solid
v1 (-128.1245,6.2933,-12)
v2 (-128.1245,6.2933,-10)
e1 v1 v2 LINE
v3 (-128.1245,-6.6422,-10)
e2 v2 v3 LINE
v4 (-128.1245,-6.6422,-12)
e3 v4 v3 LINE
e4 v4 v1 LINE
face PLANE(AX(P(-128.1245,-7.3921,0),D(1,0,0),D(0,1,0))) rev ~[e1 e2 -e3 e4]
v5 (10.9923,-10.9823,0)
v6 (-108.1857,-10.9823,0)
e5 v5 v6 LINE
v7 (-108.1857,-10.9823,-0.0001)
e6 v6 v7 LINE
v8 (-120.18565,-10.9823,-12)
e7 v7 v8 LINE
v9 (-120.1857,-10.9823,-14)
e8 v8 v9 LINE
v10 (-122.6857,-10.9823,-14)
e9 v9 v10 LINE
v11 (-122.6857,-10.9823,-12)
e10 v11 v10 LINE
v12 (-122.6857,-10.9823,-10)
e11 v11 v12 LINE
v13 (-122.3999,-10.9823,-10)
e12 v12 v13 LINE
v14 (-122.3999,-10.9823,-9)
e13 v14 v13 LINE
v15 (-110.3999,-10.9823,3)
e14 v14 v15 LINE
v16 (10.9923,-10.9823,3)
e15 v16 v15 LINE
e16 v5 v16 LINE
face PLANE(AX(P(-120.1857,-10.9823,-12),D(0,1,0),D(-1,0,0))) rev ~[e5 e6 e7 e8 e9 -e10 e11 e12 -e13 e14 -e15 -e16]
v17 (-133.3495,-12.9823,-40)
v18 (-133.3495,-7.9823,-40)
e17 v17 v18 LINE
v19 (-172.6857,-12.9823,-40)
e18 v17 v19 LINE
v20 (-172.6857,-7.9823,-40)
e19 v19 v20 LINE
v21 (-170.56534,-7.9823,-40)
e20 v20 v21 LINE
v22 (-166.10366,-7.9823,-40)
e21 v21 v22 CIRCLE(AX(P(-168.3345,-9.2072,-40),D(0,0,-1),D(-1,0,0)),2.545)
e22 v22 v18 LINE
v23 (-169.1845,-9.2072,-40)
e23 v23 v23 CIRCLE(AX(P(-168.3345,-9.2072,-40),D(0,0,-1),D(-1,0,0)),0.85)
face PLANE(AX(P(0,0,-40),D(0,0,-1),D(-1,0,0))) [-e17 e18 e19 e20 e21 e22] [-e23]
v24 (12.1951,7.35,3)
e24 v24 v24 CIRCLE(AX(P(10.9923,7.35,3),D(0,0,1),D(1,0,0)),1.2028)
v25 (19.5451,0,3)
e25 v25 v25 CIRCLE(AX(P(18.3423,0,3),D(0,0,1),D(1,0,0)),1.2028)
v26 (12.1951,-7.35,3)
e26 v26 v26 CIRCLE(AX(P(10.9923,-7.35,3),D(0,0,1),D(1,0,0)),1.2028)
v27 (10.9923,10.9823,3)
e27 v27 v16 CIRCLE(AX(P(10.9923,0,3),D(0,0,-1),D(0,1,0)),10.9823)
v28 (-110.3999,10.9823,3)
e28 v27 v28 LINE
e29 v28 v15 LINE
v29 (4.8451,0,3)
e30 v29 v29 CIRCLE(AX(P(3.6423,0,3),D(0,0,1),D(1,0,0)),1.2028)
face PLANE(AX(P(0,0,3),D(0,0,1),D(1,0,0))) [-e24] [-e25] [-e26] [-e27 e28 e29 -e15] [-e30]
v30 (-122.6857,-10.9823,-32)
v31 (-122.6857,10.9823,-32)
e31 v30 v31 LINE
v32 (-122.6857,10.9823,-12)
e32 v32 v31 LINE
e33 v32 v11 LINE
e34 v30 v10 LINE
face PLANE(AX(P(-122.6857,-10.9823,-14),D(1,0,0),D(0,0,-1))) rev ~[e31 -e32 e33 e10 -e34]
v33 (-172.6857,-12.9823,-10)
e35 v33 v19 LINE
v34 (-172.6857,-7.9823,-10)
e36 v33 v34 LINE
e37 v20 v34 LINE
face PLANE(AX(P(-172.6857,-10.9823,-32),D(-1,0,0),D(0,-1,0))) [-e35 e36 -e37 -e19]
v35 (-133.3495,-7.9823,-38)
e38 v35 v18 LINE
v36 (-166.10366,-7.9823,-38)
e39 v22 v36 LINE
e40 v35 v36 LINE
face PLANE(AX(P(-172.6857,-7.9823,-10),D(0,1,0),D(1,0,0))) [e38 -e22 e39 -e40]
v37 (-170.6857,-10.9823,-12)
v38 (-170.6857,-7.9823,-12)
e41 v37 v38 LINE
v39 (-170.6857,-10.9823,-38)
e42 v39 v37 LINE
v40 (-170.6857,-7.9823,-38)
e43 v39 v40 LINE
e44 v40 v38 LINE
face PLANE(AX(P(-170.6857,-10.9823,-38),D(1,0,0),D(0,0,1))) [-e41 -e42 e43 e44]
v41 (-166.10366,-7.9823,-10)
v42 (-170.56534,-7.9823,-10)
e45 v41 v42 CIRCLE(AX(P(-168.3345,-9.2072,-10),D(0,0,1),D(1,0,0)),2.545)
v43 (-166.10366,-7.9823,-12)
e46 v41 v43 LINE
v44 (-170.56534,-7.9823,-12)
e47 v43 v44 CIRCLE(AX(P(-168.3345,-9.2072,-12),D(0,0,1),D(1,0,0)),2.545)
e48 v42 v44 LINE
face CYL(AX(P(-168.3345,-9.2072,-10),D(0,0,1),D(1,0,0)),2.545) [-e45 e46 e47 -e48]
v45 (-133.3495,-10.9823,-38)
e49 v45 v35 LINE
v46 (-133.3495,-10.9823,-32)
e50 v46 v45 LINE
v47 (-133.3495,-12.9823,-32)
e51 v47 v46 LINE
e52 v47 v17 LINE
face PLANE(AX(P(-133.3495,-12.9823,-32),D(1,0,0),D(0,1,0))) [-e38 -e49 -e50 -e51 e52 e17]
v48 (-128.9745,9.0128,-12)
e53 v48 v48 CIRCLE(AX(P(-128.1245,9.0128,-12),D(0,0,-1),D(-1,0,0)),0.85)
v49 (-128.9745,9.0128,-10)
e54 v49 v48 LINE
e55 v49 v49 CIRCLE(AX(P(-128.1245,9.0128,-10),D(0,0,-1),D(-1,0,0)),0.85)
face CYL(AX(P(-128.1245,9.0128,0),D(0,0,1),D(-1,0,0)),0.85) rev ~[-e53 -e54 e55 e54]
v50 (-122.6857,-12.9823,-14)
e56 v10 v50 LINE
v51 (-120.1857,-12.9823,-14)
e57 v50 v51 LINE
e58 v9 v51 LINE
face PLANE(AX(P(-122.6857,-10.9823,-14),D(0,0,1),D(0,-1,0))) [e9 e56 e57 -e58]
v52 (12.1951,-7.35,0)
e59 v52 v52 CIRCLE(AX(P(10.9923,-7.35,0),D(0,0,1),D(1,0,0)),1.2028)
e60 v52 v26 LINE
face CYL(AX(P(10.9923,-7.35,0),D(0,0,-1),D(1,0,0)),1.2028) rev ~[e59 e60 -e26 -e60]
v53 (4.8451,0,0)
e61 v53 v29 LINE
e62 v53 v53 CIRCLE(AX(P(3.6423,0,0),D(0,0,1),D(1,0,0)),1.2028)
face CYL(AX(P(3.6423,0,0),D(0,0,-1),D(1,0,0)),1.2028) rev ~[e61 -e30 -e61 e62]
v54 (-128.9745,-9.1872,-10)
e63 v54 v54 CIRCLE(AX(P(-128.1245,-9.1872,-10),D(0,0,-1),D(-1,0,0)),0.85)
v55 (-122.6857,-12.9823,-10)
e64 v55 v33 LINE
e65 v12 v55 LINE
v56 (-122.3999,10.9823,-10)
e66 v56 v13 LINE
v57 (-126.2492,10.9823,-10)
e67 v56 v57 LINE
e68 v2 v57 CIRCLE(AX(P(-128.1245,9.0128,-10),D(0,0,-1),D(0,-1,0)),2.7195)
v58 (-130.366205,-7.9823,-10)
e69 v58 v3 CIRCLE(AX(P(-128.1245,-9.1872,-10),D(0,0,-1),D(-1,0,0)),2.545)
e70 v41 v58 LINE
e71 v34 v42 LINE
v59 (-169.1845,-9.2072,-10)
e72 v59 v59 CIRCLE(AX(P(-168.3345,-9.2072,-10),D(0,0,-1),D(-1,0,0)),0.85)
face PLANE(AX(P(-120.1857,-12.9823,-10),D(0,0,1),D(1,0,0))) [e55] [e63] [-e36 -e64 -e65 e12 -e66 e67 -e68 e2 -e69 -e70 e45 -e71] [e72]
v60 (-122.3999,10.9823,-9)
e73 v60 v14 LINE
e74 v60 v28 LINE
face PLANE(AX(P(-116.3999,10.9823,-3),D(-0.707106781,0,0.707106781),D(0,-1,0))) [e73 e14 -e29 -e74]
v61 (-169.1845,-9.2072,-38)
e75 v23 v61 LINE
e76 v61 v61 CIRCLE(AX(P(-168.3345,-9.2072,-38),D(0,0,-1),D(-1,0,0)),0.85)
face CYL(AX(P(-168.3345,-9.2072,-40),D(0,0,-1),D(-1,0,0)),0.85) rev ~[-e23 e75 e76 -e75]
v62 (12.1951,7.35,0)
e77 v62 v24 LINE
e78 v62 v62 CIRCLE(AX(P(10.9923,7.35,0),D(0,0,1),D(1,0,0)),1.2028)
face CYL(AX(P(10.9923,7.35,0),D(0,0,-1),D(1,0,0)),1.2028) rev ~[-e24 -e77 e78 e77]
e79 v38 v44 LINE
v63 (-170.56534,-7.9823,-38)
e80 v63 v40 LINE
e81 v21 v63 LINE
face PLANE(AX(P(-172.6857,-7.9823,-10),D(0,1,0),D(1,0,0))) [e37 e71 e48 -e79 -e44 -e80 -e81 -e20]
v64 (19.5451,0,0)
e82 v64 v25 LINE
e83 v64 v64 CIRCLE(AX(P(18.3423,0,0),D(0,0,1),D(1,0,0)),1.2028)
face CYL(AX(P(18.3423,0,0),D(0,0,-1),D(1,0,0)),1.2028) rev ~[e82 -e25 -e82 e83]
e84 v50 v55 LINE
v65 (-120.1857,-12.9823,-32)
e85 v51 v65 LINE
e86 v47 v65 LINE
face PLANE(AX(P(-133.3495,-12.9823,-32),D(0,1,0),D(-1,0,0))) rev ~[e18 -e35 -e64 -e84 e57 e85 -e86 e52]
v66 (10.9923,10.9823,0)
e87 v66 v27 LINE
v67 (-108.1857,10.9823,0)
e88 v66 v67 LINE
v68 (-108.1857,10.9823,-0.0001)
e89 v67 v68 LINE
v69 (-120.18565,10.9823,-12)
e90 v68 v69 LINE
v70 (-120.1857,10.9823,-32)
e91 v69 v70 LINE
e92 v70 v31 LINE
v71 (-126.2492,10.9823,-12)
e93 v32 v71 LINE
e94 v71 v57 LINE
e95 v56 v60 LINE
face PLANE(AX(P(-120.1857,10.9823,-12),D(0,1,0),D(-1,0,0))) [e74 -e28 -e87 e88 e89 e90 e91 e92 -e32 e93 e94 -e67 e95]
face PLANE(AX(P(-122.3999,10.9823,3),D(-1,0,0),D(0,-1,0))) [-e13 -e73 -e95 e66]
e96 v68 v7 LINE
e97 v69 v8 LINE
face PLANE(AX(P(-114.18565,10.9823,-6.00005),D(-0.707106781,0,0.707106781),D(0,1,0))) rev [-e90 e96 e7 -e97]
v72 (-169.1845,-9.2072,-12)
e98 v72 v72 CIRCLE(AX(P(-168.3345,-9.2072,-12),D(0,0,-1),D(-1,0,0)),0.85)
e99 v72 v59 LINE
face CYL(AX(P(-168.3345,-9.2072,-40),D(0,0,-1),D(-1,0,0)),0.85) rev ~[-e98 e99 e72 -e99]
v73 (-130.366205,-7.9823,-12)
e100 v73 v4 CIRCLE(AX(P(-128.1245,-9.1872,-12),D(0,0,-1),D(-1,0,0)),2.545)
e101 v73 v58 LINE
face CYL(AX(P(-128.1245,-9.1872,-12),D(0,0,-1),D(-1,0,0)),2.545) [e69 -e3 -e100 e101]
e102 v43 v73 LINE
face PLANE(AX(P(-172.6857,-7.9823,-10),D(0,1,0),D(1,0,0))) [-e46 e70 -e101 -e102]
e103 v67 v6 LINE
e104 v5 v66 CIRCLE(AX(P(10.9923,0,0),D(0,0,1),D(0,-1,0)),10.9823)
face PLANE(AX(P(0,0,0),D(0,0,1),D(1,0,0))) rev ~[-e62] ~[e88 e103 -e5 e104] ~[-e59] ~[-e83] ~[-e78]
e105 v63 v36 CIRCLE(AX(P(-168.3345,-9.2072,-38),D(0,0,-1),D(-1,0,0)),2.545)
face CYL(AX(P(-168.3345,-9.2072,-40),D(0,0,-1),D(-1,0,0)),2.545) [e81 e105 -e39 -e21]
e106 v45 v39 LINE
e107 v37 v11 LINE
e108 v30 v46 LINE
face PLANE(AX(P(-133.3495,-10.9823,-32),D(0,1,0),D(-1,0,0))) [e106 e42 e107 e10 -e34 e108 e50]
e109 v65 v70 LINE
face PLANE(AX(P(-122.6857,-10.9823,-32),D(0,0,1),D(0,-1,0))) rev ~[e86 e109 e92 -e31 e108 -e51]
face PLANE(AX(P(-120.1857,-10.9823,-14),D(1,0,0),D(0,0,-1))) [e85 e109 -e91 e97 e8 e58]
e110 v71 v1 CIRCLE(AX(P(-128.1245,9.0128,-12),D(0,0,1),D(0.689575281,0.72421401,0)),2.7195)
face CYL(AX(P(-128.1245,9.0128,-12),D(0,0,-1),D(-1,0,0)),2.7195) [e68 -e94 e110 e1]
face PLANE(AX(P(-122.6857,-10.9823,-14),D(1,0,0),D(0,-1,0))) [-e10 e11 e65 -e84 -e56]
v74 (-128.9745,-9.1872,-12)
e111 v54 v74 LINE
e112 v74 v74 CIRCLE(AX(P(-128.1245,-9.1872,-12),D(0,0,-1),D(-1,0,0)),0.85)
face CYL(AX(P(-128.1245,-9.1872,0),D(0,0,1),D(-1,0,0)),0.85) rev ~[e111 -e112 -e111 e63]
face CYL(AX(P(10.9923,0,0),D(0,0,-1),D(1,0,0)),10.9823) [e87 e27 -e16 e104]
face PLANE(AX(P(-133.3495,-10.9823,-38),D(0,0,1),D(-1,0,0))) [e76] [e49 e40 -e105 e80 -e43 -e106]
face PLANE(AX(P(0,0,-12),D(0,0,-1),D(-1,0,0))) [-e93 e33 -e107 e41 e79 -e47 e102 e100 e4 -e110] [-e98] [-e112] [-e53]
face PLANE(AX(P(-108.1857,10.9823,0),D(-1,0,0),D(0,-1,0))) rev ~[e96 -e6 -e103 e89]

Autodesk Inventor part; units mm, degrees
ref_plane "YZ Plane" through (0, 0, 0) normal (1, 0, 0) x (0, 1, 0)
ref_plane "XZ Plane" through (0, 0, 0) normal (0, 1, 0) x (-1, 0, 0)
ref_plane "XY Plane" through (0, 0, 0) normal (0, 0, 1) x (1, 0, 0)
ref_plane "Plano de trabajo1" through (0, 0, 0) normal (0, 0, 1) x (1, 0, 0)
sketch "Boceto1" plane through (0, 0, 0) normal (0, 0, 1) x (1, 0, 0)
  circle A0 centre (10.9923, -7.35) radius 1.2028 projected
  circle A1 centre (3.6423, 0) radius 1.2028 projected
  circle A2 centre (18.3423, 0) radius 1.2028 projected
  circle A3 centre (10.9923, 7.35) radius 1.2028 projected
  circle A4 centre (10.9923, 0) radius 10.9823 projected
  line L0 (10.9923, -10.9823) -> (-139.0077, -10.9823)
  line L1 (10.9923, 10.9823) -> (-139.0077, 10.9823)
  line L2 (-139.0077, 10.9823) -> (-139.0077, -10.9823)
  point P0 (0, 0)
  dimension "d0" = 150
  dimension "d1" = 150
extrude "Extrusión1" add sketch "Boceto1" along normal blind 3
sketch "Boceto2" plane through (0, 0, 3) normal (0, 0, 1) x (1, 0, 0)
  arc A0 (-129.1978, -5.6745) -> (-132.1454, -8.5217) centre (-128.1245, -9.7351) ccw
  circle A1 centre (-128.1245, 8.4649) radius 0.85 construction
  circle A2 centre (-128.1245, -9.7351) radius 0.7049 construction
  line L0 (-139.0305, -11.0697) -> (-267.2186, 10.8953)
  line L1 (-267.2186, -11.0694) -> (-117.2186, -11.0694)
  line L2 (-139.0305, 10.8953) -> (-139.0305, -11.0694)
  line L3 (-117.2186, 10.8953) -> (-267.2186, 10.8953)
  line L4 (-128.1245, -11.0697) -> (-128.1245, -0.0872)
  line L5 (-128.1245, -0.0872) -> (-128.1245, 9.0128)
  line L6 (-128.1245, -0.0872) -> (-128.1245, -9.1872)
  circle A3 centre (-128.1245, -9.1872) radius 0.85
  circle A4 centre (-128.1245, 9.0128) radius 0.85
  circle A5 centre (-128.1245, -9.1872) radius 1.8825
  circle A6 centre (-128.1245, 9.0128) radius 1.8821
  circle A7 centre (-128.1245, 9.0128) radius 0.85
  circle A8 centre (-128.1245, -9.1872) radius 0.85
  line L7 (-128.1245, 10.8953) -> (-139.0305, 10.8953)
  line L8 (-139.0077, 10.9823) -> (-139.0077, -10.9823) projected
  line L9 (-139.0077, -10.9823) -> (-139.0077, 10.9823)
  line L10 (-139.0077, 10.9823) -> (-139.0077, -10.9823)
  point P0 (0, 0)
  dimension "d4" = 10.9825
  dimension "d5" = 9.1
  dimension "d6" = 9.1
  dimension "d7" = 1.7
  dimension "d8" = 1.7
extrude "Extrusión2" cut sketch "Boceto2" against normal blind 3 contours A3 L4 | L4 A3 | A4
sketch "Boceto3" plane through (0, 0, 3) normal (0, 0, 1) x (1, 0, 0)
  circle A0 centre (-128.1245, -9.1872) radius 0.85 projected
  circle A1 centre (-128.1245, 9.0128) radius 0.85 projected
  line L0 (10.9923, 10.9823) -> (-139.0077, 10.9823) projected
  line L1 (-139.0077, 10.9823) -> (-139.0077, -10.9823) projected
  line L2 (-139.0077, -10.9823) -> (10.9923, -10.9823) projected
  arc A2 (10.9923, -10.9823) -> (10.9923, 10.9823) centre (10.9923, 0) ccw projected
  circle A3 centre (10.9923, -7.35) radius 1.2028 projected
  circle A4 centre (3.6423, 0) radius 1.2028 projected
  circle A5 centre (18.3423, 0) radius 1.2028 projected
  circle A6 centre (10.9923, 7.35) radius 1.2028 projected
  line L3 (-130.1442, 5.5225) -> (-129.5361, 14.2169) projected
  circle A7 centre (-128.1245, -9.1872) radius 1.7951
  circle A8 centre (-128.1245, 9.0128) radius 1.9695
  line L4 (-128.1245, -7.3921) -> (-128.1245, 7.0432)
  line L5 (-128.1245, -10.9823) -> (-128.1245, -18.0451)
  line L6 (-128.1245, -18.0451) -> (-142.6221, -18.554)
  line L7 (-142.6221, -18.554) -> (-141.7315, 12.8288)
  line L8 (-141.7315, 12.8288) -> (-128.1245, 12.4426)
  line L9 (-128.1245, 12.4426) -> (-128.1245, 10.9823)
  point P0 (0, 0)
extrude "Extrusión3" cut sketch "Boceto3" against normal blind 3 contours A8 L3 L0 | L3 A8 L4 A7 L2 L1 L0
sketch "Boceto4" plane through (0, 0, 0) normal (0, 0, -1) x (-1, 0, 0)
  arc A0 (128.1245, 7.0432) -> (128.1245, 10.9823) centre (128.1245, 9.0128) ccw projected
  line L0 (-10.9923, 10.9823) -> (128.1245, 10.9823) projected
  arc A1 (-10.9923, 10.9823) -> (-10.9923, -10.9823) centre (-10.9923, 0) ccw projected
  line L1 (128.1245, -10.9823) -> (-10.9923, -10.9823) projected
  arc A2 (128.1245, -10.9823) -> (128.1245, -7.3921) centre (128.1245, -9.1872) ccw projected
  line L2 (128.1245, -7.3921) -> (128.1245, 7.0432) projected
  circle A3 centre (128.1245, -9.1872) radius 0.85 projected
  circle A4 centre (128.1245, 9.0128) radius 0.85 projected
  circle A5 centre (-10.9923, -7.35) radius 1.2028 projected
  circle A6 centre (-3.6423, 0) radius 1.2028 projected
  circle A7 centre (-18.3423, 0) radius 1.2028 projected
  circle A8 centre (-10.9923, 7.35) radius 1.2028 projected
  line L3 (108.1857, 10.9823) -> (108.1857, -10.9823)
  point P0 (0, 0)
extrude "Extrusión4" add sketch "Boceto4" along normal blind 12 contours L2 A2 L1 L3 L0 A0
sketch "Boceto5" plane through (0, 0, 3) normal (0, 0, 1) x (1, 0, 0)
  line L0 (-108.1857, -10.9823) -> (-108.1857, 10.9823) projected
  circle A0 centre (10.9923, 7.35) radius 1.2028 projected
  circle A1 centre (18.3423, 0) radius 1.2028 projected
  circle A2 centre (3.6423, 0) radius 1.2028 projected
  circle A3 centre (10.9923, -7.35) radius 1.2028 projected
  arc A4 (-128.1245, 10.9823) -> (-128.1245, 7.0432) centre (-128.1245, 9.0128) ccw projected
  line L1 (-128.1245, 7.0432) -> (-128.1245, -7.3921) projected
  arc A5 (-128.1245, -7.3921) -> (-128.1245, -10.9823) centre (-128.1245, -9.1872) ccw projected
  line L2 (-128.1245, -10.9823) -> (10.9923, -10.9823) projected
  arc A6 (10.9923, -10.9823) -> (10.9923, 10.9823) centre (10.9923, 0) ccw projected
  line L3 (10.9923, 10.9823) -> (-128.1245, 10.9823) projected
  circle A7 centre (-128.1245, 9.0128) radius 0.85 projected
  circle A8 centre (-128.1245, -9.1872) radius 0.85 projected
  line L4 (-108.1857, 10.9823) -> (-111.1857, 10.9823)
  line L5 (-111.1857, 10.9823) -> (-111.1857, -10.9823)
  line L6 (-111.1857, -10.9823) -> (-108.1857, -10.9823)
  line L7 (-108.1857, -10.9823) -> (-108.1857, 10.9823)
  line L8 (10.9923, 10.9823) -> (-128.1245, 10.9823) projected
  line L9 (-122.3999, 10.9823) -> (-122.3999, -10.9823)
  point P0 (0, 0)
  dimension "d15" = 3
extrude "Extrusión5" cut sketch "Boceto5" against normal blind 13 contours L2 A5 L1 A4 L3 L9
chamfer "Chaflán1" distance 12 angle 45 1 edges at (-122.3999, 0, 3)
chamfer "Chaflán2" distance 12 angle 45 1 edges at (-108.1857, 0, -12)
sketch "Boceto6" plane through (0, 0, -12) normal (0, 0, -1) x (-1, 0, 0)
  line L0 (126.0445, -11.1372) -> (126.0445, 10.9228)
  line L1 (120.1857, -10.9823) -> (120.1857, 10.9823) projected
  line L2 (120.1857, -10.9823) -> (128.1245, -10.9823) projected
  line L3 (120.1857, 10.9823) -> (122.6857, 10.9823)
  line L4 (122.6857, 10.9823) -> (122.6857, -10.9823)
  line L5 (122.6857, -10.9823) -> (120.1857, -10.9823)
  line L6 (120.1857, -10.9823) -> (120.1857, 10.9823)
  point P0 (0, 0)
  dimension "d24" = 2.5
extrude "Extrusión6" add sketch "Boceto6" along normal blind 20
sketch "Boceto7" plane through (-128.1245, -10.9823, -10) normal (0, -1, 0) x (1, 0, 0)
  line L0 (19.9388, 10) -> (7.9388, -2) projected
  line L1 (19.9388, 10) -> (139.1168, 10) projected
  line L2 (139.1168, 10) -> (139.1168, 13) projected
  line L3 (17.7246, 13) -> (139.1168, 13) projected
  line L4 (5.7246, 1) -> (17.7246, 13) projected
  line L5 (5.7246, 1) -> (5.7246, 0) projected
  line L6 (5.7246, 0) -> (0, 0) projected
  line L7 (0, 0) -> (0, -2) projected
  line L8 (5.4388, -2) -> (0, -2) projected
  line L9 (5.4388, -2) -> (5.4388, -22) projected
  line L10 (7.9388, -22) -> (5.4388, -22) projected
  line L11 (7.9388, -2) -> (7.9388, -22) projected
  line L12 (7.9388, -2) -> (7.9388, -22) projected
  line L13 (5.4388, -22) -> (7.9388, -22)
  line L14 (7.9388, -22) -> (7.9388, -4)
  line L15 (7.9388, -4) -> (5.4388, -4)
  line L16 (5.4388, -4) -> (5.4388, -22)
  point P0 (128.1245, 10)
  point P1 (5.4388, -4)
  dimension "d27" = 18
extrude "Extrusión7" add sketch "Boceto7" along normal blind 2 contours L11 L10 L9 L15
sketch "Boceto8" plane through (-122.6857, -10.9823, -12) normal (-1, 0, 0) x (0, 0, 1)
  line L0 (0, 21.9646) -> (0, 0) projected
  line L1 (0, 21.9646) -> (-20, 21.9646) projected
  line L2 (-20, 21.9646) -> (-20, -2) projected
  line L3 (-2, -2) -> (-20, -2) projected
  line L4 (-2, 0) -> (-2, -2) projected
  line L5 (0, 0) -> (-2, 0) projected
  line L6 (-20, 0) -> (-2, 0)
  point P0 (12, 10.9823)
extrude "Extrusión8" add sketch "Boceto8" along normal blind 50 contours L4 L3 L2 L6
sketch "Boceto9" plane through (-120.1857, -12.9823, -14) normal (0, 0, 1) x (1, 0, 0)
  line L0 (-2.5, 2) -> (0, 2) projected
  line L1 (-2.5, 2) -> (-52.5, 2) projected
  line L2 (-52.5, 0) -> (-52.5, 2) projected
  line L3 (0, 0) -> (-52.5, 0) projected
  line L4 (0, 2) -> (0, 0) projected
  line L5 (-2.5, 0) -> (-52.5, 0)
  line L6 (-52.5, 0) -> (-52.5, 2)
  line L7 (-52.5, 2) -> (-2.5, 2)
  line L8 (-2.5, 2) -> (-2.5, 0)
  point P0 (120.1857, 12.9823)
extrude "Extrusión9" add sketch "Boceto9" along normal blind 4 contours L8 L3 L2 L1
sketch "Boceto10" plane through (0, 0, -32) normal (0, 0, -1) x (-1, 0, 0)
  line L0 (120.1857, 10.9823) -> (120.1857, -12.9823) projected
  line L1 (120.1857, -12.9823) -> (172.6857, -12.9823) projected
  line L2 (172.6857, -10.9823) -> (172.6857, -12.9823) projected
  line L3 (122.6857, -10.9823) -> (172.6857, -10.9823) projected
  line L4 (122.6857, 10.9823) -> (122.6857, -10.9823) projected
  line L5 (122.6857, 10.9823) -> (120.1857, 10.9823) projected
  line L6 (133.3495, -12.9823) -> (133.3495, -10.9823)
  line L7 (128.1245, -10.9823) -> (172.6857, -10.9823) projected
  point P0 (0, 0)
extrude "Extrusión10" add sketch "Boceto10" along normal blind 8 contours L6 L3 L2 L1
sketch "Boceto11" plane through (-172.6857, -10.9823, -10) normal (0, 1, 0) x (1, 0, 0)
  line L0 (50, 22) -> (50, 4) projected
  line L1 (50, 22) -> (39.3362, 22) projected
  line L2 (39.3362, 22) -> (39.3362, 30) projected
  line L3 (0, 30) -> (39.3362, 30) projected
  line L4 (0, 30) -> (0, 0) projected
  line L5 (44.5612, 0) -> (0, 0) projected
  line L6 (44.5612, 0) -> (44.5612, 2) projected
  line L7 (50, 2) -> (44.5612, 2) projected
  line L8 (50, 2) -> (50, 4) projected
  line L9 (39.3362, 22) -> (39.3362, 30) projected
  line L10 (39.3362, 30) -> (39.3362, 28)
  line L11 (39.3362, 28) -> (0, 28)
  line L12 (0, 28) -> (2, 28)
  line L13 (2, 28) -> (2, 0)
  line L14 (0, 0) -> (0, 30) projected
  line L15 (0, 0) -> (0, 2)
  line L16 (0, 2) -> (43.0714, 2)
  line L17 (43.0714, 2) -> (43.0714, 0)
  line L18 (44.5612, 0) -> (0, 0) projected
  point P0 (172.6857, -10)
  point P1 (2, 2)
  point P2 (39.3362, 28)
  dimension "d36" = 2
  dimension "d37" = 2
  dimension "d38" = 2
extrude "Extrusión11" add sketch "Boceto11" along normal blind 3 contours L11 L4 L3 L2 | L13 L16 L4 L11 | L16 L17 L5 L13 | L13 L5 L4 L16
sketch "Boceto12" plane through (0, 0, -40) normal (0, 0, -1) x (-1, 0, 0)
  circle A0 centre (168.3345, -9.2072) radius 0.85
  point P0 (0, 0)
extrude "Extrusión12" cut sketch "Boceto12" against normal blind 35
sketch "Boceto13" plane through (0, 0, -12) normal (0, 0, -1) x (-1, 0, 0)
  circle A0 centre (168.3345, -9.2072) radius 0.85 projected
  circle A1 centre (128.1245, 9.0128) radius 0.85 projected
  circle A2 centre (128.1245, -9.1872) radius 0.85 projected
  arc A3 (129.6143, -8.1857) -> (128.1245, -7.3921) centre (128.1245, -9.1872) ccw projected
  line L0 (128.1245, -7.3921) -> (128.1245, 7.0432) projected
  arc A4 (128.1245, 7.0432) -> (128.1245, 10.9823) centre (128.1245, 9.0128) ccw projected
  line L1 (128.1245, 10.9823) -> (122.6857, 10.9823) projected
  line L2 (122.6857, 10.9823) -> (122.6857, -10.9823) projected
  line L3 (122.6857, -10.9823) -> (128.1245, -10.9823) projected
  arc A5 (128.1245, -10.9823) -> (129.6143, -10.1887) centre (128.1245, -9.1872) ccw projected
  line L4 (129.6143, -10.9823) -> (129.6143, -10.1887) projected
  line L5 (170.6857, -10.9823) -> (129.6143, -10.9823) projected
  line L6 (170.6857, -10.9823) -> (170.6857, -7.9823) projected
  line L7 (129.6143, -7.9823) -> (170.6857, -7.9823) projected
  line L8 (129.6143, -8.1857) -> (129.6143, -7.9823) projected
  circle A6 centre (128.1245, 9.0128) radius 2.7195
  circle A7 centre (128.1245, -9.1872) radius 2.545
  point P0 (0, 0)
  point P1 (126.3205, -10.9823)
  point P2 (129.9286, -10.9823)
  point P3 (130.3662, -7.9823)
  point P4 (128.1245, -6.6422)
  point P5 (128.1245, 6.2933)
  point P6 (126.2493, 10.9823)
  dimension "d43" = 5.439
  dimension "d44" = 5.09
extrude "Extrusión13" add sketch "Boceto13" against normal blind 2 contours A3 L0 A7 L7 L8 | L0 A4 L1 A6 | L3 A5 L4 L5 A7 picked at (127.0429, 11.109)
sketch "Boceto14" plane through (0, 0, -10) normal (0, 0, 1) x (1, 0, 0)
  circle A0 centre (-128.1245, -9.1872) radius 0.85 projected
  arc A1 (-128.1245, -6.6422) -> (-130.3662, -7.9823) centre (-128.1245, -9.1872) ccw projected
  circle A2 centre (-168.3345, -9.2072) radius 0.85 projected
  circle A3 centre (-168.3345, -9.2072) radius 0.85 projected
  circle A4 centre (-168.3345, -9.2072) radius 2.545
  line L0 (-172.6857, -7.9823) -> (-130.3662, -7.9823) projected
  point P0 (0, 0)
  point P1 (-170.5654, -7.9823)
  point P2 (-166.1037, -7.9823)
  dimension "d47" = 5.09
extrude "Extrusión14" add sketch "Boceto14" against normal blind 2 contours L0 A4 picked at (-168.0387, -7.2686)
sketch "Boceto15" plane through (0, 0, -40) normal (0, 0, -1) x (-1, 0, 0)
  circle A0 centre (168.3345, -9.2072) radius 0.85 projected
  circle A1 centre (168.3345, -9.2072) radius 2.545
  line L0 (133.3495, -7.9823) -> (172.6857, -7.9823) projected
  point P0 (0, 0)
  point P1 (166.1037, -7.9823)
  point P2 (170.5654, -7.9823)
  dimension "d50" = 5.09
extrude "Extrusión15" add sketch "Boceto15" against normal blind 2 contours L0 A1 picked at (168.6303, -7.2686)
properties part number "femurAux"
